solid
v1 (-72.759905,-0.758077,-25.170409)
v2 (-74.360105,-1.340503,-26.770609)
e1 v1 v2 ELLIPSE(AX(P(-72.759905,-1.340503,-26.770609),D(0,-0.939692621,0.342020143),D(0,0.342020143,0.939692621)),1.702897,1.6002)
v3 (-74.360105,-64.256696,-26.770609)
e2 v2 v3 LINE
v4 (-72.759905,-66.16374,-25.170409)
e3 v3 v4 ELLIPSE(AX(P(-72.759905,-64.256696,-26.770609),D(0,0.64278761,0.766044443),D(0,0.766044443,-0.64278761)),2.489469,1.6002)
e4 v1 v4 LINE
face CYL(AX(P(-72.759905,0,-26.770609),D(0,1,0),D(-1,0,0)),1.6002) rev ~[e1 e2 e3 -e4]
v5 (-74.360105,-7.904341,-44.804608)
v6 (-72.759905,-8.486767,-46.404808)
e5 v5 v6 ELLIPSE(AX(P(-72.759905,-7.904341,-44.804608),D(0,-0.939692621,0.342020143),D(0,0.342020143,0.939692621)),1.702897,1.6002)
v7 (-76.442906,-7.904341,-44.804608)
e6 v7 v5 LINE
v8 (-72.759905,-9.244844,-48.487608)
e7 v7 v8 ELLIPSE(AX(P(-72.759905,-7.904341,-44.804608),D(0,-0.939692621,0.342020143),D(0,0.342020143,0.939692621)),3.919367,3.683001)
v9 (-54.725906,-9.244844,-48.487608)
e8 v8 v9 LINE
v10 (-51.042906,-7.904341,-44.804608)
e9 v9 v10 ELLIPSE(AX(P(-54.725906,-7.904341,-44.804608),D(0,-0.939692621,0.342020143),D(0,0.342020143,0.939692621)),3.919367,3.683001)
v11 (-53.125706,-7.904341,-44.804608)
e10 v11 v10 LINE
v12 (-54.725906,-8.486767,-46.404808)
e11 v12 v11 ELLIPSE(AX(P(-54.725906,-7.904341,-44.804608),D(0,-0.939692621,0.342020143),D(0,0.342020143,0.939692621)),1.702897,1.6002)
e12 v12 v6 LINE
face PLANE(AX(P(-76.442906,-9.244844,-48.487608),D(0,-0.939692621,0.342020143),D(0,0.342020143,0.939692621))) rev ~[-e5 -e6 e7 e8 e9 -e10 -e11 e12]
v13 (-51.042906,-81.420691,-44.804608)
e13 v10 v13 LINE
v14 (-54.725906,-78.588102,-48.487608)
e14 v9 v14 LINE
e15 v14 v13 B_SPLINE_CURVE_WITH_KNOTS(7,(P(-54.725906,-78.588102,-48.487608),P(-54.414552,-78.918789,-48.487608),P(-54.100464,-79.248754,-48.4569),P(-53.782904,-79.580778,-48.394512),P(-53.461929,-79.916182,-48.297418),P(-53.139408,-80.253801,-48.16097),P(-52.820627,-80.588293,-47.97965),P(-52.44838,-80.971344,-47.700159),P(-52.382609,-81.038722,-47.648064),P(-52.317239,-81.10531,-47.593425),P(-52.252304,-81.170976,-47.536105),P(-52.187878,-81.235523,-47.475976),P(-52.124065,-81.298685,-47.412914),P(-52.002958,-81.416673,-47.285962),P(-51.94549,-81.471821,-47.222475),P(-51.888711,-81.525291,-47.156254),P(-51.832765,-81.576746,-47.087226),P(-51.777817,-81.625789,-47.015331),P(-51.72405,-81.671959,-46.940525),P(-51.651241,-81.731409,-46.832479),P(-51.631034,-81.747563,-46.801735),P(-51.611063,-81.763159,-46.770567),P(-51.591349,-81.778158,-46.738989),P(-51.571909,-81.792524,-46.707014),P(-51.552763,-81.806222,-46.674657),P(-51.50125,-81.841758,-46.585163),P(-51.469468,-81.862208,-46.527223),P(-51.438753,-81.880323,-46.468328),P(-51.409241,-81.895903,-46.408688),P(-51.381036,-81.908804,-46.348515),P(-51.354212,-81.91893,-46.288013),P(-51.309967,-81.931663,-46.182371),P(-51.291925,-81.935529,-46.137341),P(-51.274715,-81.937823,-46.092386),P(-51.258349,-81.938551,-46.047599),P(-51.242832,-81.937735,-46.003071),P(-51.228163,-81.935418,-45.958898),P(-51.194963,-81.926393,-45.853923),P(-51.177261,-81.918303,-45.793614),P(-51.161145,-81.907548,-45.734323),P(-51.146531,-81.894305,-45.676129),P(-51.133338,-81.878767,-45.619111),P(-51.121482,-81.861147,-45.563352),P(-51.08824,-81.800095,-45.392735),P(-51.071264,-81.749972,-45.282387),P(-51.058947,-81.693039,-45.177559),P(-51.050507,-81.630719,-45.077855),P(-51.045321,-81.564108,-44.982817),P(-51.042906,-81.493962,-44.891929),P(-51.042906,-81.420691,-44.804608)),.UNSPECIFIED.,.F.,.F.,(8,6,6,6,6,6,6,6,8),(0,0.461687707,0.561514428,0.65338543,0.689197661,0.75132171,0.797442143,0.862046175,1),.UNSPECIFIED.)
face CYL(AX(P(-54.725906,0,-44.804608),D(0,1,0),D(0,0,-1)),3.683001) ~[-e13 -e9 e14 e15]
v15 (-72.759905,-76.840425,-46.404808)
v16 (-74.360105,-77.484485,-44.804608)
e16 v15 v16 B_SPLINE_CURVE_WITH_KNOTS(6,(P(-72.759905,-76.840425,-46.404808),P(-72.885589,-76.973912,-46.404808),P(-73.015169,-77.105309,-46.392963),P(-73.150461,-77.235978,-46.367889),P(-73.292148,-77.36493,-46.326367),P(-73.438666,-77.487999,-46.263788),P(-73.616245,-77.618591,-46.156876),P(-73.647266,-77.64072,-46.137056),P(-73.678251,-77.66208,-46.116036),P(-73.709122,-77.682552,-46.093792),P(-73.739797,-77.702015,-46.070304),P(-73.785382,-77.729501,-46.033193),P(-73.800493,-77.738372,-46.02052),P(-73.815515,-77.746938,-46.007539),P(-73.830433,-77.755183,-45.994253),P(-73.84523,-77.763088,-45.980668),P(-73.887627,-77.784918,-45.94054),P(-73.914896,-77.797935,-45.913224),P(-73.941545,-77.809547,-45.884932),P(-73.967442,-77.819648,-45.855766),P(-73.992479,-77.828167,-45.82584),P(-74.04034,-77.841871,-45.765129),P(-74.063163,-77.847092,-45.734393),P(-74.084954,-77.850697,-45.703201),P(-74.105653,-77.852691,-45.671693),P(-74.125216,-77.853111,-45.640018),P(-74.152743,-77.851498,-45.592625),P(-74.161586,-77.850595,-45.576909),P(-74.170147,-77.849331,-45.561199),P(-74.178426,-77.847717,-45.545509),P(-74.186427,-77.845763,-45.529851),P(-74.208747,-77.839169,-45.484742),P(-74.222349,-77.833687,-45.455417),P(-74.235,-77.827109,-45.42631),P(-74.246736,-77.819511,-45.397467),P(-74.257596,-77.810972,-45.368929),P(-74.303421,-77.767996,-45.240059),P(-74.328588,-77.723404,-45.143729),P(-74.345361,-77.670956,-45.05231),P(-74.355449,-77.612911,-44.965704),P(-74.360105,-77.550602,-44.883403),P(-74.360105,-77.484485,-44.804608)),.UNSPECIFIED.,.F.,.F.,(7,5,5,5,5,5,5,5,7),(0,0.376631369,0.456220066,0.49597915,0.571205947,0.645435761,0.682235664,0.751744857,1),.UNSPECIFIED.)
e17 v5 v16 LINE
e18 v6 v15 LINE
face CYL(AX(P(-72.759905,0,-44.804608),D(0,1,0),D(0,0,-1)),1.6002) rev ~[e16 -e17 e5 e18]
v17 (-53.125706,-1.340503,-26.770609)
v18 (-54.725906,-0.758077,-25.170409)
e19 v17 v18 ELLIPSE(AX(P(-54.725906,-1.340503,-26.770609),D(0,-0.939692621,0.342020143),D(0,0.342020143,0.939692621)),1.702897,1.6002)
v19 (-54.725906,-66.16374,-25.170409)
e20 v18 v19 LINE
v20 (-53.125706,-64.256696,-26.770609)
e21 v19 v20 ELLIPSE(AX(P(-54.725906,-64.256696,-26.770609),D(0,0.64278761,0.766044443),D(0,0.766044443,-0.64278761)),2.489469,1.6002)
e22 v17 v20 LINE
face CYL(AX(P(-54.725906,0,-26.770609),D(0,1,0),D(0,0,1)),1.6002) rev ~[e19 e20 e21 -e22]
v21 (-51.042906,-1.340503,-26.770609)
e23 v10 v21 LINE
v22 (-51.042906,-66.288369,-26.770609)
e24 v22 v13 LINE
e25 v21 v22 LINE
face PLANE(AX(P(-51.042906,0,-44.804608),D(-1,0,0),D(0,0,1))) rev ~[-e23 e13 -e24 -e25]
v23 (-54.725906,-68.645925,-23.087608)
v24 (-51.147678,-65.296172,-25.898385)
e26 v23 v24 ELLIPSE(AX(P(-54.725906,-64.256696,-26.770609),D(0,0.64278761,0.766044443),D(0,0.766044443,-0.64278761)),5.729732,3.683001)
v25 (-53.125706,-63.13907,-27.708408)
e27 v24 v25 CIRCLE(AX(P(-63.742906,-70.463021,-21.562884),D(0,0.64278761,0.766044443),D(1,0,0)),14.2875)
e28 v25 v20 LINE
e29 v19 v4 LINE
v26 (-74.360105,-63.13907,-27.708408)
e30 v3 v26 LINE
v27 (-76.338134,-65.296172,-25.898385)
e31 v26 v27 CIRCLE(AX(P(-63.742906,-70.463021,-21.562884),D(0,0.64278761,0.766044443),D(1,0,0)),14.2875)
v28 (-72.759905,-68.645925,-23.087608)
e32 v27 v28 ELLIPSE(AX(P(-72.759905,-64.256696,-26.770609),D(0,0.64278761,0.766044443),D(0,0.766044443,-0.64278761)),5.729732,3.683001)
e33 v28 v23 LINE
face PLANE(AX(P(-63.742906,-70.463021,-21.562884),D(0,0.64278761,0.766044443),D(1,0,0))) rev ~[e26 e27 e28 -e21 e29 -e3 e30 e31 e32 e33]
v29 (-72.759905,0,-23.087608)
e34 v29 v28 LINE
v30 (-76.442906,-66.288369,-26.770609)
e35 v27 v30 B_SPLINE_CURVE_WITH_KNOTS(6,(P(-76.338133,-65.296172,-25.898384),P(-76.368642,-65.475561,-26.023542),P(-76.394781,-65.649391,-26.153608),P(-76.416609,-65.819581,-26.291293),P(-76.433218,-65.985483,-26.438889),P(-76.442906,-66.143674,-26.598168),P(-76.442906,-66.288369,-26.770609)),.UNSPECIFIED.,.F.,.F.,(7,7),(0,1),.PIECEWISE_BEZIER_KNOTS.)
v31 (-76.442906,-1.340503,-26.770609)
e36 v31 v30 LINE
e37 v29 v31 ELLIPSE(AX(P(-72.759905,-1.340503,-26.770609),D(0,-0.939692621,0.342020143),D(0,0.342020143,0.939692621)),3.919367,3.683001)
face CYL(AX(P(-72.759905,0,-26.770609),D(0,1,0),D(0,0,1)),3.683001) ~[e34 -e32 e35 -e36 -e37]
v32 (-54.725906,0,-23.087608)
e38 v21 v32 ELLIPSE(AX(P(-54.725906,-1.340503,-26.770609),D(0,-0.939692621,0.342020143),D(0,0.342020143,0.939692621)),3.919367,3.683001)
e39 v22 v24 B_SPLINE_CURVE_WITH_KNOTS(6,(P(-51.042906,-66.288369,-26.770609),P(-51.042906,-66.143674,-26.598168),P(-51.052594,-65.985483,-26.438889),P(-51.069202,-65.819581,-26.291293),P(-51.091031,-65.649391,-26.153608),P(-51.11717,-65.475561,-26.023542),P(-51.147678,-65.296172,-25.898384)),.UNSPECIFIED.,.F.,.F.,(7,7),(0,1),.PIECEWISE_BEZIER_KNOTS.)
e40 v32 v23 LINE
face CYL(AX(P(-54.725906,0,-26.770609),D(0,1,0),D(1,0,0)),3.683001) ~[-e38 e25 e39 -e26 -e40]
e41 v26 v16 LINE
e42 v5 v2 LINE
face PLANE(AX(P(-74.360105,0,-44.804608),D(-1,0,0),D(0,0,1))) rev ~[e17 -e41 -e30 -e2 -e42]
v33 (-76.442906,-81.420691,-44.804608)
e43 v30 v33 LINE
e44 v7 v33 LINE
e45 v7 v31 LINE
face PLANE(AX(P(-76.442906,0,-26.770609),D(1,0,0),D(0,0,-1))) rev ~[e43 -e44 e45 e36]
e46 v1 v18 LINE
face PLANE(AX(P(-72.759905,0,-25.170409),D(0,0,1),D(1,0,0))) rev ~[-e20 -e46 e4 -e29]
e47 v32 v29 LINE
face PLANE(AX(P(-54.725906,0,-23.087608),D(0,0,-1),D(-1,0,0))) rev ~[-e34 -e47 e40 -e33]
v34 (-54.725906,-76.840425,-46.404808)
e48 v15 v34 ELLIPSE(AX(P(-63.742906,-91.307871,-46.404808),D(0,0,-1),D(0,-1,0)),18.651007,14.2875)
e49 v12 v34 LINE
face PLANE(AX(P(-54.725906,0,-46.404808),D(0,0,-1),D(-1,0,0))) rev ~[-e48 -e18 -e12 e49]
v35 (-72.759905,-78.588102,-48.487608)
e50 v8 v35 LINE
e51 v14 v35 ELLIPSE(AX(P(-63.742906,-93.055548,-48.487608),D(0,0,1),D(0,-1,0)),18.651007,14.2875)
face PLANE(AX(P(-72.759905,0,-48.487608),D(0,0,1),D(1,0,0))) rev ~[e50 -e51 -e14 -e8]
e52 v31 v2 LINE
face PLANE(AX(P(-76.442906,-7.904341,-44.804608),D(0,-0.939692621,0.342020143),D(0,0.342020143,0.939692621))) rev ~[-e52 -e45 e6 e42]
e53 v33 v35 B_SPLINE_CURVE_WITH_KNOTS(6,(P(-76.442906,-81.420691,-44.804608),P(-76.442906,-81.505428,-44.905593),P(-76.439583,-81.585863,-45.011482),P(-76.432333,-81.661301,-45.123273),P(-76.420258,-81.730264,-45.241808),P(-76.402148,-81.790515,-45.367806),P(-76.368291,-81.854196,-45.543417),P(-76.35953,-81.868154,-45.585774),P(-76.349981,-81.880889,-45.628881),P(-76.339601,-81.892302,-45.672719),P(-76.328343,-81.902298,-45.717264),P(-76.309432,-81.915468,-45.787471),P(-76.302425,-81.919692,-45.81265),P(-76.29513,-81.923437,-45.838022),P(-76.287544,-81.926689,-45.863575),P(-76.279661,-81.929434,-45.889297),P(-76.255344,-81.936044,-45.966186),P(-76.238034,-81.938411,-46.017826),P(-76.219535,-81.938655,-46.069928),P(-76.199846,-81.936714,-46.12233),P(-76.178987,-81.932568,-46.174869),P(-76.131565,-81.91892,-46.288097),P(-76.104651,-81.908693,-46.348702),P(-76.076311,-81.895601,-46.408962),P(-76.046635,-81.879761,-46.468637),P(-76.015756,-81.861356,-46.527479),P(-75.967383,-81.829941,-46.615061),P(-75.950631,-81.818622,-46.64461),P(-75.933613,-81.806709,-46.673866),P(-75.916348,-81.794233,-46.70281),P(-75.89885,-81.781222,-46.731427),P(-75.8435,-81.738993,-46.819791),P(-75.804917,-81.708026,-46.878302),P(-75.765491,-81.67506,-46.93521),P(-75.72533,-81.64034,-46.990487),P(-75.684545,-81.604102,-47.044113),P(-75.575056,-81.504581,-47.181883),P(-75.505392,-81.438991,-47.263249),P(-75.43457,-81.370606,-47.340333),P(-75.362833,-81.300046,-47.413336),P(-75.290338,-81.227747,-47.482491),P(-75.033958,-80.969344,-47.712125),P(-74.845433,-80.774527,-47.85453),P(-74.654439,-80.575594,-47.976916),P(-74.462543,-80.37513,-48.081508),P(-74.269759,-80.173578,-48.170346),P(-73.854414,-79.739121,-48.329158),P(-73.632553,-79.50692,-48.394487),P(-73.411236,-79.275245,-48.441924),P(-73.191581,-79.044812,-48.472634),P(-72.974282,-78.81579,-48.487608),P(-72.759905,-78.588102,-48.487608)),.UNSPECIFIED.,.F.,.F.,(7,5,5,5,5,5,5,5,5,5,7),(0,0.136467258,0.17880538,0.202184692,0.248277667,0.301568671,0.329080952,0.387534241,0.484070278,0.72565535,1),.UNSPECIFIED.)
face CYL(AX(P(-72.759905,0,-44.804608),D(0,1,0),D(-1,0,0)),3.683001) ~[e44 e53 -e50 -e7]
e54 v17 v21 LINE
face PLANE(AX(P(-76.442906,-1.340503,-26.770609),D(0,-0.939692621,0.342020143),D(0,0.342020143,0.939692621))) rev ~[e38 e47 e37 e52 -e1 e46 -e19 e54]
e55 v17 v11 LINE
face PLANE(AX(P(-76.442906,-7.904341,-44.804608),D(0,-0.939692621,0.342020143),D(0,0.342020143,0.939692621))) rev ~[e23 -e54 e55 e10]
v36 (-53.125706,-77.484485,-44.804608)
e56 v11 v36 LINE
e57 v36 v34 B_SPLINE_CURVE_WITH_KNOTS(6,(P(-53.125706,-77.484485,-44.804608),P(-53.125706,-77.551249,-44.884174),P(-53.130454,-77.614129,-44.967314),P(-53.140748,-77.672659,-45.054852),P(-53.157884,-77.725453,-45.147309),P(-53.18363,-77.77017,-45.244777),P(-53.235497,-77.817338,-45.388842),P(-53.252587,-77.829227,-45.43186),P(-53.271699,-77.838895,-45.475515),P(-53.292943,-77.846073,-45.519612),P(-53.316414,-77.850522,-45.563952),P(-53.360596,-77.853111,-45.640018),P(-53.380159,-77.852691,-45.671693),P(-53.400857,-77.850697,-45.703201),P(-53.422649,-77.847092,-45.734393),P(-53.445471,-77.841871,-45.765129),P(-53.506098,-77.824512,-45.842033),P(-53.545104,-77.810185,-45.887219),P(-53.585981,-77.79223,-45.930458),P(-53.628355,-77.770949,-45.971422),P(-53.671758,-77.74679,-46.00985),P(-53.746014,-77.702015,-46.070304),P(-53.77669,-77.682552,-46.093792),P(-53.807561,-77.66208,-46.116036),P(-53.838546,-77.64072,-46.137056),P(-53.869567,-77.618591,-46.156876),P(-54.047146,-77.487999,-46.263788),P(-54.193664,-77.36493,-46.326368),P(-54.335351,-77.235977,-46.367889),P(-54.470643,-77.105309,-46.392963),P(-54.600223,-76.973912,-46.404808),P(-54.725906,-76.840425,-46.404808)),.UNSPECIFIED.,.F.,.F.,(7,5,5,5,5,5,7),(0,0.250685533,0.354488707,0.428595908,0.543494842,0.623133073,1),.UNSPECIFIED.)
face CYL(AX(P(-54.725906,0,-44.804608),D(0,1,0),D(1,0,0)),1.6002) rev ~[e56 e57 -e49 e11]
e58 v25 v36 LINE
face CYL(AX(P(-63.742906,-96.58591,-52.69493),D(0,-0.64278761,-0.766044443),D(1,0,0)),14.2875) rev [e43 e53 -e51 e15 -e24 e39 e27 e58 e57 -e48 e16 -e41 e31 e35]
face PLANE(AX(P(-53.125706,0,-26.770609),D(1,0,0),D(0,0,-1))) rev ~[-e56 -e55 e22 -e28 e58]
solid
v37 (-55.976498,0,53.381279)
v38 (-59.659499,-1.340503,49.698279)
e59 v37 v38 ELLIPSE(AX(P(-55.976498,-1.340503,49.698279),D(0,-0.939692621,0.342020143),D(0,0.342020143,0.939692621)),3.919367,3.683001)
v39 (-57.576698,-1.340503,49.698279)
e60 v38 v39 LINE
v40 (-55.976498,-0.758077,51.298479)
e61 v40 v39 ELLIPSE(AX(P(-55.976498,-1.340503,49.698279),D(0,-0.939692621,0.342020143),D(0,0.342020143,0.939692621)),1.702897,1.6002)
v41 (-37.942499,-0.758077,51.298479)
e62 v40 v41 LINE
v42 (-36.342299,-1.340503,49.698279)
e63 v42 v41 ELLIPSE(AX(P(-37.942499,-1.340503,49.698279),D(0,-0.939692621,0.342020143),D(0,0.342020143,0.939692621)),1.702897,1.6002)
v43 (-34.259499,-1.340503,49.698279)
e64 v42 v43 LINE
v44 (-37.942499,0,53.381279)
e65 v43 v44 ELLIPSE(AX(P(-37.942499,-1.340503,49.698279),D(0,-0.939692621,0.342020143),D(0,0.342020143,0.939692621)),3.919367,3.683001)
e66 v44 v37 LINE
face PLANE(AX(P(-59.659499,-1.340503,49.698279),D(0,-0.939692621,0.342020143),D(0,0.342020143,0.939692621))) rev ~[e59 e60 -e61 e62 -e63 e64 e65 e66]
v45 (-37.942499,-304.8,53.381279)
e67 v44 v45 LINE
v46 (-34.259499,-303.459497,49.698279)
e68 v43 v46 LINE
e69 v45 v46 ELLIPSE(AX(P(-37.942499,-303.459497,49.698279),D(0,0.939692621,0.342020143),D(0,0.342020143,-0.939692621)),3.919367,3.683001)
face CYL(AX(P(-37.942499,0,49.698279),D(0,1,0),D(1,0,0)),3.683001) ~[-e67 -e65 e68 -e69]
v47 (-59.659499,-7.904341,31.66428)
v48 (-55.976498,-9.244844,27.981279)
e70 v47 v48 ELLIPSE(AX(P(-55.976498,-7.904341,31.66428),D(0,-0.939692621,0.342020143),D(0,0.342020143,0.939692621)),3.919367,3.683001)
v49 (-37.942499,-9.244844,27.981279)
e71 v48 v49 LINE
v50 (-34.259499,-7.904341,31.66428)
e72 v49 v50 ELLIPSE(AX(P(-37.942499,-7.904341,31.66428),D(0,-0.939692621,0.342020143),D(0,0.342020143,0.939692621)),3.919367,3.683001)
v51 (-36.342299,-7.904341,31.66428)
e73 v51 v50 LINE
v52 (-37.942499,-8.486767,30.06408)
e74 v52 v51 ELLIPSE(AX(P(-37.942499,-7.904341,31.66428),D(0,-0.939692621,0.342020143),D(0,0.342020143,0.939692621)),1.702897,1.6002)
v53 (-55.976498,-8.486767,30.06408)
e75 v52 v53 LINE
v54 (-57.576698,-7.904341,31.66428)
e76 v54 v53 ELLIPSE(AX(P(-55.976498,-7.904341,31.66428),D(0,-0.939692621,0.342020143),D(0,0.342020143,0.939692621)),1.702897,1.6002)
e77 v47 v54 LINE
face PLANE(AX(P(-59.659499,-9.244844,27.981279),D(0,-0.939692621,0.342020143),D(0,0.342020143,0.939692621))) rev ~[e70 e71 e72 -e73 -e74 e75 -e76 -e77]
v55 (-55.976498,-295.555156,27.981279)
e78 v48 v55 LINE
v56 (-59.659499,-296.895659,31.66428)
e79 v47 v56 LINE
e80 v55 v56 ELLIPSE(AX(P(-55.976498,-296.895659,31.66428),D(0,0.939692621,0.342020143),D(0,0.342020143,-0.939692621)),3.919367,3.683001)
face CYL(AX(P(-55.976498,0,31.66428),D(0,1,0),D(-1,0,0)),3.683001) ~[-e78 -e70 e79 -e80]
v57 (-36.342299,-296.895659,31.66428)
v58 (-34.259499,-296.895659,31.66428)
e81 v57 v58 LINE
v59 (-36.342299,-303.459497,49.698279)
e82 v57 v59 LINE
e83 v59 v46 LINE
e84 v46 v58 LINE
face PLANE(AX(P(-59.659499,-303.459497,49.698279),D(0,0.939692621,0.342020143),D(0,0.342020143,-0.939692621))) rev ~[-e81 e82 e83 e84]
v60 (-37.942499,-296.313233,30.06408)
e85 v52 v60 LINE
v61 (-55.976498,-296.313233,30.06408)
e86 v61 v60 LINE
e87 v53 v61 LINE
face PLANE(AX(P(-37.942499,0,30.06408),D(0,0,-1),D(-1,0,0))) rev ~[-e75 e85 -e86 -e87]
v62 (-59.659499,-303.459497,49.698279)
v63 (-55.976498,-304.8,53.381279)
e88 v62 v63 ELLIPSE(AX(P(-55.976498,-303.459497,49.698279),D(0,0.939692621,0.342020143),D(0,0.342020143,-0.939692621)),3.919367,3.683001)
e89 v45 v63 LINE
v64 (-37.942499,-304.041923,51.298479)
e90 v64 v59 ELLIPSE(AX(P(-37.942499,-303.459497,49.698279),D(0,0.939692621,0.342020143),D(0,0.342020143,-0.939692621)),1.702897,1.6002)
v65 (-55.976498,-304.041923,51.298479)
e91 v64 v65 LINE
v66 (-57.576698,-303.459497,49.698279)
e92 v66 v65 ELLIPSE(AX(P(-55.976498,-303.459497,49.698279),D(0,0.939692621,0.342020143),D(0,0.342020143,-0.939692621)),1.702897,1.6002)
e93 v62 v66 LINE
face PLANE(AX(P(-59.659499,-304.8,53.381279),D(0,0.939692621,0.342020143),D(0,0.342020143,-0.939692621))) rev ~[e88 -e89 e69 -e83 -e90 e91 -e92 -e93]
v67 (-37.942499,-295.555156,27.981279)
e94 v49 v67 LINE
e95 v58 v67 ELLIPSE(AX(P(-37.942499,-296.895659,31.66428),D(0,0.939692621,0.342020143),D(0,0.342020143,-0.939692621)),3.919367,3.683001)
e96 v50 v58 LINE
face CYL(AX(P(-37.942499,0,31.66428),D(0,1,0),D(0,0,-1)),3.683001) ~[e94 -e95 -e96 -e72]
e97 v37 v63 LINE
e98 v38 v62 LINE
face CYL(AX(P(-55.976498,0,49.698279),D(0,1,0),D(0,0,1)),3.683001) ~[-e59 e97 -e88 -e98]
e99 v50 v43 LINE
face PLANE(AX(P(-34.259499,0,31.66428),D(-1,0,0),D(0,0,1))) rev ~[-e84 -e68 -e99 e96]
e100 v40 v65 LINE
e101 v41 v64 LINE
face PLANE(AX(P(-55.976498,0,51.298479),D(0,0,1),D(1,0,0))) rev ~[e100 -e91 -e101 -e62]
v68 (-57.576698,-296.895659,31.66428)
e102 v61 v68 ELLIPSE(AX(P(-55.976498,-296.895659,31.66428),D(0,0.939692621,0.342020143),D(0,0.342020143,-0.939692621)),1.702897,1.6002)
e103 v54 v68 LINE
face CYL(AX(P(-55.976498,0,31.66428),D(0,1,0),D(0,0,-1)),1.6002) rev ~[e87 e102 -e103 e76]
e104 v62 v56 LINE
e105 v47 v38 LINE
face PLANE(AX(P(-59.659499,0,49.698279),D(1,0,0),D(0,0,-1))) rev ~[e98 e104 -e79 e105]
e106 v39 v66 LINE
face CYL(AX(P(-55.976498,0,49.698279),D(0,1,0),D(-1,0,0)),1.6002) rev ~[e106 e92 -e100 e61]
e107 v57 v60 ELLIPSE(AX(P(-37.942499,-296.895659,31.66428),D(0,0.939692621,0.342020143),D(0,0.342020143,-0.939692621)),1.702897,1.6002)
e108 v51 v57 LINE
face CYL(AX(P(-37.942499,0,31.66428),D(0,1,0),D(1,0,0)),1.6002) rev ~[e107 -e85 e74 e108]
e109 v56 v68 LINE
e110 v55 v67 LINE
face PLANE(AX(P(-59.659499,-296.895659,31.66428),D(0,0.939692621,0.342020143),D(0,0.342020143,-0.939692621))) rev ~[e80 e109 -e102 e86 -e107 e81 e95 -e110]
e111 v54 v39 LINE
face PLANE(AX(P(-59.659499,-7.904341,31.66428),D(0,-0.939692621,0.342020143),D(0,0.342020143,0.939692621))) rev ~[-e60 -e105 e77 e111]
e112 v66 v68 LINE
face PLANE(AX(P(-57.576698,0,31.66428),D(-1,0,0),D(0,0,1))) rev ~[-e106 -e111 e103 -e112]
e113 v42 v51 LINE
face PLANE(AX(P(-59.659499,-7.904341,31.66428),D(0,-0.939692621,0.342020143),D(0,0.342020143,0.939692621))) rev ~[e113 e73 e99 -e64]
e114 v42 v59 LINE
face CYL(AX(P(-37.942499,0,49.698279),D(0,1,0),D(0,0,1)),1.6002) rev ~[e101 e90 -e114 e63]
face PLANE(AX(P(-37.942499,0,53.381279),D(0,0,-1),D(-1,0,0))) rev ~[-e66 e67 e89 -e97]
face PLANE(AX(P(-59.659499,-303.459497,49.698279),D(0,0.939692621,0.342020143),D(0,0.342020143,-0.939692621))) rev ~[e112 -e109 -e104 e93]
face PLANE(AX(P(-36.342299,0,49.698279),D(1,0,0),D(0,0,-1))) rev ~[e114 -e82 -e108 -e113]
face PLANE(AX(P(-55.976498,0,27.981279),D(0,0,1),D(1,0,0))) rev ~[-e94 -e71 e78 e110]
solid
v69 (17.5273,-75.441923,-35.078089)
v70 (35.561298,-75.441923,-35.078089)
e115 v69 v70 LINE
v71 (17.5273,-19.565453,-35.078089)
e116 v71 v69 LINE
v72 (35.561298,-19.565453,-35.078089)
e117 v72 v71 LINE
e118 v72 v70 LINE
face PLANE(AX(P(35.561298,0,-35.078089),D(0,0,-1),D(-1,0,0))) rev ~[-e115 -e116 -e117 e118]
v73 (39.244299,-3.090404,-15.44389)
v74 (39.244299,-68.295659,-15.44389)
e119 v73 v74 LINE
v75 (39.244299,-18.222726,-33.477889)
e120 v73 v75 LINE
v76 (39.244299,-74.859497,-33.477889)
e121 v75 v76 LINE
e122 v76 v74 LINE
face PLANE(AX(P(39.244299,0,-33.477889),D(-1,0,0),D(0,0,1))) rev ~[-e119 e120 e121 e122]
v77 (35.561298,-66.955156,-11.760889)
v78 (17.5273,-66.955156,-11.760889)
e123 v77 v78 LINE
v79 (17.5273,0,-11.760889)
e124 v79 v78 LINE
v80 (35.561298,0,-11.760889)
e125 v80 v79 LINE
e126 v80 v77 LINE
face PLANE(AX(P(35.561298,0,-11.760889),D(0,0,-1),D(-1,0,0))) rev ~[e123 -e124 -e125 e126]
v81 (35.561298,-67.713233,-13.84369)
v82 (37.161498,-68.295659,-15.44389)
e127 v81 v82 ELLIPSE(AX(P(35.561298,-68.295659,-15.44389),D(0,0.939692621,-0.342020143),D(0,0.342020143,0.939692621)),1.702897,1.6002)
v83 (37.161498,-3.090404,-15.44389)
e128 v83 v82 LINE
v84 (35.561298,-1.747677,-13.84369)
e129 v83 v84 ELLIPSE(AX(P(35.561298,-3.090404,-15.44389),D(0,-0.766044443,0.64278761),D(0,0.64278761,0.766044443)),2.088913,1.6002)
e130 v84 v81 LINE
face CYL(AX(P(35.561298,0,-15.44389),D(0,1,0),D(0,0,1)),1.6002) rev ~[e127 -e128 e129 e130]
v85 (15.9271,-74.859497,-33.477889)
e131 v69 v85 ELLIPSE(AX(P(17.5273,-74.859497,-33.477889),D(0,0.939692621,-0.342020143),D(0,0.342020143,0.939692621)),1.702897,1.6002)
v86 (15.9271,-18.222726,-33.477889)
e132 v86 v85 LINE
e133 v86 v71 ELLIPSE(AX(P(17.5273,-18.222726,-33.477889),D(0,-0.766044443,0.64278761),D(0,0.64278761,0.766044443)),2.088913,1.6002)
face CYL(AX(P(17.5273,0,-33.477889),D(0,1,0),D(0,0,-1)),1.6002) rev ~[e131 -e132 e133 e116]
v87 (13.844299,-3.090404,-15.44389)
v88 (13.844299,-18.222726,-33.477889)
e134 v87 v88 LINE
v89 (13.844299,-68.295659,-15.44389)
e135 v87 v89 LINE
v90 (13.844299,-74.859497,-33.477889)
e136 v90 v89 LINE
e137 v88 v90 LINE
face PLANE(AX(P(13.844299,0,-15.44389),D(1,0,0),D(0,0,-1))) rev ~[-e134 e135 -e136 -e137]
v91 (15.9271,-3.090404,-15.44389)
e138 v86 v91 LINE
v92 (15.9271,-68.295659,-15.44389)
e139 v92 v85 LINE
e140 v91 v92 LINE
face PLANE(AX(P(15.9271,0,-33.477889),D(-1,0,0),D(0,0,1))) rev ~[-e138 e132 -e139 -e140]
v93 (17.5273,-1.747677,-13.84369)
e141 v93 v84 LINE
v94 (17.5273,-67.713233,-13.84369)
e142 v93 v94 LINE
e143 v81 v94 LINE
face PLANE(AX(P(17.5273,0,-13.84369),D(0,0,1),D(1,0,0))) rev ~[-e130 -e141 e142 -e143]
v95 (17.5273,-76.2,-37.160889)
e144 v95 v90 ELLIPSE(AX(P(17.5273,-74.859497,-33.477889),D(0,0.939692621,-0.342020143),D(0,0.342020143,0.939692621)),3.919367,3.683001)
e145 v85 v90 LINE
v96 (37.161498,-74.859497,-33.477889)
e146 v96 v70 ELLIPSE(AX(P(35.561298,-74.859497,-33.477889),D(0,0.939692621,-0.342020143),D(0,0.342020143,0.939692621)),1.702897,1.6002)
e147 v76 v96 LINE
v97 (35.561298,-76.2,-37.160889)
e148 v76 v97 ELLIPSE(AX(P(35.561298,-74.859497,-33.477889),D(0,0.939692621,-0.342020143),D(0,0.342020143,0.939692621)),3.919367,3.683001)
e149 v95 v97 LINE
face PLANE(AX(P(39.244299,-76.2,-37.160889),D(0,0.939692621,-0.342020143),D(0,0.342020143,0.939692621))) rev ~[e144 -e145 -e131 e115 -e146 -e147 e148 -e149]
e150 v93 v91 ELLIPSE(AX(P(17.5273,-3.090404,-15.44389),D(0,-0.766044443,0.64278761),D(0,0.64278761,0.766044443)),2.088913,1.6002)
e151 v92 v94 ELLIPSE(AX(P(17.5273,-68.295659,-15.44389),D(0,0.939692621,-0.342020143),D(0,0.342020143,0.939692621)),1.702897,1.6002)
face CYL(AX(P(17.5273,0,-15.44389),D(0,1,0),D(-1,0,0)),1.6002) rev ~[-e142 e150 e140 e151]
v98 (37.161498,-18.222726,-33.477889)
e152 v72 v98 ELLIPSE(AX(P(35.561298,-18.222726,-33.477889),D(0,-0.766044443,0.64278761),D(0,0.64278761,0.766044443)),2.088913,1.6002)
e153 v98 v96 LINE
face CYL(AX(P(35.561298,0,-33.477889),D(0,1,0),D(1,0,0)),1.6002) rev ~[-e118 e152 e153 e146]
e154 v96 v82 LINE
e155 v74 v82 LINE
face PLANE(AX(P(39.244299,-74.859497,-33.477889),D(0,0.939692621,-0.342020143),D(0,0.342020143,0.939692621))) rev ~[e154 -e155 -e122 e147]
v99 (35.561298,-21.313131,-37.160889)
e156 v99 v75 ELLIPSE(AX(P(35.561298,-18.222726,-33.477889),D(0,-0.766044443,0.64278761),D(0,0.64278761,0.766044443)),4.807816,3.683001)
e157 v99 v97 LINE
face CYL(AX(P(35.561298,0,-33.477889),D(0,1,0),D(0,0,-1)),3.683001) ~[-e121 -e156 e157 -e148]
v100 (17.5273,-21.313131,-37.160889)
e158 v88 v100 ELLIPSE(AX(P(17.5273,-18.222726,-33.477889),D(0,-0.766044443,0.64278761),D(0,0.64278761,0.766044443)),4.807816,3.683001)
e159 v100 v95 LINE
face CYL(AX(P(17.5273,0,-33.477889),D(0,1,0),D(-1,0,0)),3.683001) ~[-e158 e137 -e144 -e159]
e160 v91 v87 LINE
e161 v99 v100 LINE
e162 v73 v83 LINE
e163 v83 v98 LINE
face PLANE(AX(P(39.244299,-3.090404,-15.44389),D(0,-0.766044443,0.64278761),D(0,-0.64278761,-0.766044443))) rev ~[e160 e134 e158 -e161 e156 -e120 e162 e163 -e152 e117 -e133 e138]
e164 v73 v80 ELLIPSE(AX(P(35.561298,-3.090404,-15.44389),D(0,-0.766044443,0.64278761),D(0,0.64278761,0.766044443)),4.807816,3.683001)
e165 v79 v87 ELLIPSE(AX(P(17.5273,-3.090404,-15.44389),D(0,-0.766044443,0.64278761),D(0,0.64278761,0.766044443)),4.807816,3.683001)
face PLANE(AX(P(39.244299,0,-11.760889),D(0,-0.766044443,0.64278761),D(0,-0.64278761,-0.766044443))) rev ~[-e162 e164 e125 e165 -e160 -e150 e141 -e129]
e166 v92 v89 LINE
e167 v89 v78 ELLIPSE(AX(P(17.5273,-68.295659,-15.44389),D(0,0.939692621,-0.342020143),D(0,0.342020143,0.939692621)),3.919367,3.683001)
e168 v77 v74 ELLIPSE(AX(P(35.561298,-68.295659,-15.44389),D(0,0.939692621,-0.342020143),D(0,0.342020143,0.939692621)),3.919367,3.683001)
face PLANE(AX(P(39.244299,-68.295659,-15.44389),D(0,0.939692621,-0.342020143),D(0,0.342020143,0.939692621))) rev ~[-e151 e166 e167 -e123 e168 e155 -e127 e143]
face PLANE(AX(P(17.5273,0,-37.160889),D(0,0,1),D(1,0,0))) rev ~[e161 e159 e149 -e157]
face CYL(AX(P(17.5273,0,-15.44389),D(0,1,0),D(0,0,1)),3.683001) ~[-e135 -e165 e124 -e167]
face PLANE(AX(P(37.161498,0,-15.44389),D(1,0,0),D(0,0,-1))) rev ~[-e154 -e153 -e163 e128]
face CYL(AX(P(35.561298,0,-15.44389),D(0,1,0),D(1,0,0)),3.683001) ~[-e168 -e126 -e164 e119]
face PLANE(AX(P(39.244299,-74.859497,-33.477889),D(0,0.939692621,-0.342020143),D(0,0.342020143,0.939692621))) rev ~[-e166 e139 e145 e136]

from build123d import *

# Parameters (mm, degrees)
F1_DEPTH  = 304.8
F3_DEPTH  = 101.6
F5_DEPTH  = 25.4
F7_DEPTH  = 25.4
F10_R     = 14.2875
F11_DEPTH = 40.64
F13_DEPTH = 76.2
F15_DEPTH = 25.4


with BuildPart() as f1:
    # F0 (on Front) → F1 (new body)
    with BuildSketch(Plane.XZ):
        with BuildLine():
            Line((-37.9424992715, 53.3812791109), (-55.9764980507, 53.3812791109))
            ThreePointArc((-55.9764980507, 53.3812791109), (-58.5807727574, 52.3025532072), (-59.6594986611, 49.6982785005))
            Line((-59.6594986611, 49.6982785005), (-59.6594986611, 31.6642797213))
            ThreePointArc((-59.6594986611, 31.6642797213), (-58.5807727574, 29.0600050146), (-55.9764980507, 27.9812791109))
            Line((-55.9764980507, 27.9812791109), (-37.9424992715, 27.9812791109))
            ThreePointArc((-37.9424992715, 27.9812791109), (-35.3382245648, 29.0600050146), (-34.2594986611, 31.6642797213))
            Line((-34.2594986611, 31.6642797213), (-34.2594986611, 49.6982785005))
            ThreePointArc((-34.2594986611, 49.6982785005), (-35.3382245648, 52.3025532072), (-37.9424992715, 53.3812791109))
        make_face()
        with BuildLine():
            ThreePointArc((-57.5766980507, 49.6982785005), (-57.108010322, 50.8297907718), (-55.9764980507, 51.2984785005))
            Line((-55.9764980507, 51.2984785005), (-37.9424992715, 51.2984785005))
            ThreePointArc((-37.9424992715, 51.2984785005), (-36.8109870002, 50.8297907718), (-36.3422992715, 49.6982785005))
            Line((-36.3422992715, 49.6982785005), (-36.3422992715, 31.6642797213))
            ThreePointArc((-36.3422992715, 31.6642797213), (-36.8109870002, 30.53276745), (-37.9424992715, 30.0640797213))
            Line((-37.9424992715, 30.0640797213), (-55.9764980507, 30.0640797213))
            ThreePointArc((-55.9764980507, 30.0640797213), (-57.108010322, 30.53276745), (-57.5766980507, 31.6642797213))
            Line((-57.5766980507, 31.6642797213), (-57.5766980507, 49.6982785005))
        make_face(mode=Mode.SUBTRACT)
    extrude(amount=F1_DEPTH)

    # F4 (on face) → F5 (cut, through all)
    with BuildSketch(Plane(origin=(-59.6594986611, 0, 0), x_dir=(0, -1, 0), z_dir=(-1, 0, 0))):
        Polygon((7.9043413554, 31.6642797213), (1.340502595, 49.6982785005), (0, 49.6982785005), (0, 31.6642797213), align=None)
        Polygon((1.340502595, 49.6982785005), (0, 53.3812791109), (0, 49.6982785005), align=None)
        Polygon((9.2448439504, 27.9812791109), (7.9043413554, 31.6642797213), (0, 31.6642797213), (0, 27.9812791109), align=None)
        Polygon((304.8, 53.3812791109), (303.459497405, 49.6982785005), (304.8, 49.6982785005), align=None)
        Polygon((304.8, 49.6982785005), (303.459497405, 49.6982785005), (296.8956586446, 31.6642797213), (304.8, 31.6642797213), align=None)
        Polygon((304.8, 31.6642797213), (296.8956586446, 31.6642797213), (295.5551560496, 27.9812791109), (304.8, 27.9812791109), align=None)
    extrude(amount=-F5_DEPTH, mode=Mode.SUBTRACT)


with BuildPart() as f3:
    # F2 (on Front) → F3 (new body)
    with BuildSketch(Plane.XZ):
        with BuildLine():
            Line((-54.7259064655, -23.0876084745), (-72.7599052448, -23.0876084745))
            ThreePointArc((-72.7599052448, -23.0876084745), (-75.3641799515, -24.1663343782), (-76.4429058552, -26.7706090849))
            Line((-76.4429058552, -26.7706090849), (-76.4429058552, -44.8046078641))
            ThreePointArc((-76.4429058552, -44.8046078641), (-75.3641799515, -47.4088825708), (-72.7599052448, -48.4876084745))
            Line((-72.7599052448, -48.4876084745), (-54.7259064655, -48.4876084745))
            ThreePointArc((-54.7259064655, -48.4876084745), (-52.1216317588, -47.4088825708), (-51.0429058552, -44.8046078641))
            Line((-51.0429058552, -44.8046078641), (-51.0429058552, -26.7706090849))
            ThreePointArc((-51.0429058552, -26.7706090849), (-52.1216317588, -24.1663343782), (-54.7259064655, -23.0876084745))
        make_face()
        with BuildLine():
            ThreePointArc((-74.3601052448, -26.7706090849), (-73.8914175161, -25.6390968136), (-72.7599052448, -25.1704090849))
            Line((-72.7599052448, -25.1704090849), (-54.7259064655, -25.1704090849))
            ThreePointArc((-54.7259064655, -25.1704090849), (-53.5943941943, -25.6390968136), (-53.1257064655, -26.7706090849))
            Line((-53.1257064655, -26.7706090849), (-53.1257064655, -44.8046078641))
            ThreePointArc((-53.1257064655, -44.8046078641), (-53.5943941943, -45.9361201354), (-54.7259064655, -46.4048078641))
            Line((-54.7259064655, -46.4048078641), (-72.7599052448, -46.4048078641))
            ThreePointArc((-72.7599052448, -46.4048078641), (-73.8914175161, -45.9361201354), (-74.3601052448, -44.8046078641))
            Line((-74.3601052448, -44.8046078641), (-74.3601052448, -26.7706090849))
        make_face(mode=Mode.SUBTRACT)
    extrude(amount=F3_DEPTH)

    # F6 (on face) → F7 (cut, through all)
    with BuildSketch(Plane(origin=(-76.4429058552, 0, 0), x_dir=(0, -1, 0), z_dir=(-1, 0, 0))):
        Polygon((1.340502595, -26.7706090849), (0, -26.7706090849), (0, -44.8046078641), (7.9043413554, -44.8046078641), align=None)
        Polygon((7.9043413554, -44.8046078641), (0, -44.8046078641), (0, -48.4876084745), (9.2448439504, -48.4876084745), align=None)
        Polygon((1.340502595, -26.7706090849), (0, -23.0876084745), (0, -26.7706090849), align=None)
        Polygon((80.2868693681, -23.0876084745), (83.3772738219, -26.7706090849), (101.6, -26.7706090849), (101.6, -23.0876084745), align=None)
        Polygon((101.6, -26.7706090849), (83.3772738219, -26.7706090849), (98.5095955462, -44.8046078641), (101.6, -44.8046078641), align=None)
        Polygon((101.6, -44.8046078641), (98.5095955462, -44.8046078641), (101.6, -48.4876084745), align=None)
    extrude(amount=-F7_DEPTH, mode=Mode.SUBTRACT)

    # F10 (on face) → F11 (cut)
    with BuildSketch(Plane(origin=(0, -65.8541589499, -78.4819305158), x_dir=(1, 0, 0), z_dir=(0, 0.6427876097, 0.7660444431))):
        with Locations((-63.7429058552, -40.1174512895)):
            Circle(F10_R)
    extrude(amount=F11_DEPTH, mode=Mode.SUBTRACT)


with BuildPart() as f13:
    # F12 (on Front) → F13 (new body)
    with BuildSketch(Plane.XZ):
        with BuildLine():
            Line((35.5612983663, -11.7608893991), (17.527299587, -11.7608893991))
            ThreePointArc((17.527299587, -11.7608893991), (14.9230248803, -12.8396153027), (13.8442989767, -15.4438900094))
            Line((13.8442989767, -15.4438900094), (13.8442989767, -33.4778887887))
            ThreePointArc((13.8442989767, -33.4778887887), (14.9230248803, -36.0821634954), (17.527299587, -37.1608893991))
            Line((17.527299587, -37.1608893991), (35.5612983663, -37.1608893991))
            ThreePointArc((35.5612983663, -37.1608893991), (38.165573073, -36.0821634954), (39.2442989767, -33.4778887887))
            Line((39.2442989767, -33.4778887887), (39.2442989767, -15.4438900094))
            ThreePointArc((39.2442989767, -15.4438900094), (38.165573073, -12.8396153027), (35.5612983663, -11.7608893991))
        make_face()
        with BuildLine():
            ThreePointArc((15.927099587, -15.4438900094), (16.3957873158, -14.3123777382), (17.527299587, -13.8436900094))
            Line((17.527299587, -13.8436900094), (35.5612983663, -13.8436900094))
            ThreePointArc((35.5612983663, -13.8436900094), (36.6928106376, -14.3123777382), (37.1614983663, -15.4438900094))
            Line((37.1614983663, -15.4438900094), (37.1614983663, -33.4778887887))
            ThreePointArc((37.1614983663, -33.4778887887), (36.6928106376, -34.6094010599), (35.5612983663, -35.0780887887))
            Line((35.5612983663, -35.0780887887), (17.527299587, -35.0780887887))
            ThreePointArc((17.527299587, -35.0780887887), (16.3957873158, -34.6094010599), (15.927099587, -33.4778887887))
            Line((15.927099587, -33.4778887887), (15.927099587, -15.4438900094))
        make_face(mode=Mode.SUBTRACT)
    extrude(amount=F13_DEPTH)

    # F14 (on face) → F15 (cut, through all)
    with BuildSketch(Plane.YZ.offset(39.2442989767)):
        Polygon((-76.2, -15.4438900094), (-68.2956586446, -15.4438900094), (-66.9551560496, -11.7608893991), (-76.2, -11.7608893991), align=None)
        Polygon((-74.859497405, -33.4778887887), (-68.2956586446, -15.4438900094), (-76.2, -15.4438900094), (-76.2, -33.4778887887), align=None)
        Polygon((-76.2, -37.1608893991), (-74.859497405, -33.4778887887), (-76.2, -33.4778887887), align=None)
        Polygon((0, -33.4778887887), (-18.2227261781, -33.4778887887), (-21.3131306319, -37.1608893991), (0, -37.1608893991), align=None)
        Polygon((0, -15.4438900094), (-3.0904044538, -15.4438900094), (-18.2227261781, -33.4778887887), (0, -33.4778887887), align=None)
        Polygon((0, -15.4438900094), (0, -11.7608893991), (-3.0904044538, -15.4438900094), align=None)
    extrude(amount=-F15_DEPTH, mode=Mode.SUBTRACT)


solid = Compound([f1.part, f3.part, f13.part])
